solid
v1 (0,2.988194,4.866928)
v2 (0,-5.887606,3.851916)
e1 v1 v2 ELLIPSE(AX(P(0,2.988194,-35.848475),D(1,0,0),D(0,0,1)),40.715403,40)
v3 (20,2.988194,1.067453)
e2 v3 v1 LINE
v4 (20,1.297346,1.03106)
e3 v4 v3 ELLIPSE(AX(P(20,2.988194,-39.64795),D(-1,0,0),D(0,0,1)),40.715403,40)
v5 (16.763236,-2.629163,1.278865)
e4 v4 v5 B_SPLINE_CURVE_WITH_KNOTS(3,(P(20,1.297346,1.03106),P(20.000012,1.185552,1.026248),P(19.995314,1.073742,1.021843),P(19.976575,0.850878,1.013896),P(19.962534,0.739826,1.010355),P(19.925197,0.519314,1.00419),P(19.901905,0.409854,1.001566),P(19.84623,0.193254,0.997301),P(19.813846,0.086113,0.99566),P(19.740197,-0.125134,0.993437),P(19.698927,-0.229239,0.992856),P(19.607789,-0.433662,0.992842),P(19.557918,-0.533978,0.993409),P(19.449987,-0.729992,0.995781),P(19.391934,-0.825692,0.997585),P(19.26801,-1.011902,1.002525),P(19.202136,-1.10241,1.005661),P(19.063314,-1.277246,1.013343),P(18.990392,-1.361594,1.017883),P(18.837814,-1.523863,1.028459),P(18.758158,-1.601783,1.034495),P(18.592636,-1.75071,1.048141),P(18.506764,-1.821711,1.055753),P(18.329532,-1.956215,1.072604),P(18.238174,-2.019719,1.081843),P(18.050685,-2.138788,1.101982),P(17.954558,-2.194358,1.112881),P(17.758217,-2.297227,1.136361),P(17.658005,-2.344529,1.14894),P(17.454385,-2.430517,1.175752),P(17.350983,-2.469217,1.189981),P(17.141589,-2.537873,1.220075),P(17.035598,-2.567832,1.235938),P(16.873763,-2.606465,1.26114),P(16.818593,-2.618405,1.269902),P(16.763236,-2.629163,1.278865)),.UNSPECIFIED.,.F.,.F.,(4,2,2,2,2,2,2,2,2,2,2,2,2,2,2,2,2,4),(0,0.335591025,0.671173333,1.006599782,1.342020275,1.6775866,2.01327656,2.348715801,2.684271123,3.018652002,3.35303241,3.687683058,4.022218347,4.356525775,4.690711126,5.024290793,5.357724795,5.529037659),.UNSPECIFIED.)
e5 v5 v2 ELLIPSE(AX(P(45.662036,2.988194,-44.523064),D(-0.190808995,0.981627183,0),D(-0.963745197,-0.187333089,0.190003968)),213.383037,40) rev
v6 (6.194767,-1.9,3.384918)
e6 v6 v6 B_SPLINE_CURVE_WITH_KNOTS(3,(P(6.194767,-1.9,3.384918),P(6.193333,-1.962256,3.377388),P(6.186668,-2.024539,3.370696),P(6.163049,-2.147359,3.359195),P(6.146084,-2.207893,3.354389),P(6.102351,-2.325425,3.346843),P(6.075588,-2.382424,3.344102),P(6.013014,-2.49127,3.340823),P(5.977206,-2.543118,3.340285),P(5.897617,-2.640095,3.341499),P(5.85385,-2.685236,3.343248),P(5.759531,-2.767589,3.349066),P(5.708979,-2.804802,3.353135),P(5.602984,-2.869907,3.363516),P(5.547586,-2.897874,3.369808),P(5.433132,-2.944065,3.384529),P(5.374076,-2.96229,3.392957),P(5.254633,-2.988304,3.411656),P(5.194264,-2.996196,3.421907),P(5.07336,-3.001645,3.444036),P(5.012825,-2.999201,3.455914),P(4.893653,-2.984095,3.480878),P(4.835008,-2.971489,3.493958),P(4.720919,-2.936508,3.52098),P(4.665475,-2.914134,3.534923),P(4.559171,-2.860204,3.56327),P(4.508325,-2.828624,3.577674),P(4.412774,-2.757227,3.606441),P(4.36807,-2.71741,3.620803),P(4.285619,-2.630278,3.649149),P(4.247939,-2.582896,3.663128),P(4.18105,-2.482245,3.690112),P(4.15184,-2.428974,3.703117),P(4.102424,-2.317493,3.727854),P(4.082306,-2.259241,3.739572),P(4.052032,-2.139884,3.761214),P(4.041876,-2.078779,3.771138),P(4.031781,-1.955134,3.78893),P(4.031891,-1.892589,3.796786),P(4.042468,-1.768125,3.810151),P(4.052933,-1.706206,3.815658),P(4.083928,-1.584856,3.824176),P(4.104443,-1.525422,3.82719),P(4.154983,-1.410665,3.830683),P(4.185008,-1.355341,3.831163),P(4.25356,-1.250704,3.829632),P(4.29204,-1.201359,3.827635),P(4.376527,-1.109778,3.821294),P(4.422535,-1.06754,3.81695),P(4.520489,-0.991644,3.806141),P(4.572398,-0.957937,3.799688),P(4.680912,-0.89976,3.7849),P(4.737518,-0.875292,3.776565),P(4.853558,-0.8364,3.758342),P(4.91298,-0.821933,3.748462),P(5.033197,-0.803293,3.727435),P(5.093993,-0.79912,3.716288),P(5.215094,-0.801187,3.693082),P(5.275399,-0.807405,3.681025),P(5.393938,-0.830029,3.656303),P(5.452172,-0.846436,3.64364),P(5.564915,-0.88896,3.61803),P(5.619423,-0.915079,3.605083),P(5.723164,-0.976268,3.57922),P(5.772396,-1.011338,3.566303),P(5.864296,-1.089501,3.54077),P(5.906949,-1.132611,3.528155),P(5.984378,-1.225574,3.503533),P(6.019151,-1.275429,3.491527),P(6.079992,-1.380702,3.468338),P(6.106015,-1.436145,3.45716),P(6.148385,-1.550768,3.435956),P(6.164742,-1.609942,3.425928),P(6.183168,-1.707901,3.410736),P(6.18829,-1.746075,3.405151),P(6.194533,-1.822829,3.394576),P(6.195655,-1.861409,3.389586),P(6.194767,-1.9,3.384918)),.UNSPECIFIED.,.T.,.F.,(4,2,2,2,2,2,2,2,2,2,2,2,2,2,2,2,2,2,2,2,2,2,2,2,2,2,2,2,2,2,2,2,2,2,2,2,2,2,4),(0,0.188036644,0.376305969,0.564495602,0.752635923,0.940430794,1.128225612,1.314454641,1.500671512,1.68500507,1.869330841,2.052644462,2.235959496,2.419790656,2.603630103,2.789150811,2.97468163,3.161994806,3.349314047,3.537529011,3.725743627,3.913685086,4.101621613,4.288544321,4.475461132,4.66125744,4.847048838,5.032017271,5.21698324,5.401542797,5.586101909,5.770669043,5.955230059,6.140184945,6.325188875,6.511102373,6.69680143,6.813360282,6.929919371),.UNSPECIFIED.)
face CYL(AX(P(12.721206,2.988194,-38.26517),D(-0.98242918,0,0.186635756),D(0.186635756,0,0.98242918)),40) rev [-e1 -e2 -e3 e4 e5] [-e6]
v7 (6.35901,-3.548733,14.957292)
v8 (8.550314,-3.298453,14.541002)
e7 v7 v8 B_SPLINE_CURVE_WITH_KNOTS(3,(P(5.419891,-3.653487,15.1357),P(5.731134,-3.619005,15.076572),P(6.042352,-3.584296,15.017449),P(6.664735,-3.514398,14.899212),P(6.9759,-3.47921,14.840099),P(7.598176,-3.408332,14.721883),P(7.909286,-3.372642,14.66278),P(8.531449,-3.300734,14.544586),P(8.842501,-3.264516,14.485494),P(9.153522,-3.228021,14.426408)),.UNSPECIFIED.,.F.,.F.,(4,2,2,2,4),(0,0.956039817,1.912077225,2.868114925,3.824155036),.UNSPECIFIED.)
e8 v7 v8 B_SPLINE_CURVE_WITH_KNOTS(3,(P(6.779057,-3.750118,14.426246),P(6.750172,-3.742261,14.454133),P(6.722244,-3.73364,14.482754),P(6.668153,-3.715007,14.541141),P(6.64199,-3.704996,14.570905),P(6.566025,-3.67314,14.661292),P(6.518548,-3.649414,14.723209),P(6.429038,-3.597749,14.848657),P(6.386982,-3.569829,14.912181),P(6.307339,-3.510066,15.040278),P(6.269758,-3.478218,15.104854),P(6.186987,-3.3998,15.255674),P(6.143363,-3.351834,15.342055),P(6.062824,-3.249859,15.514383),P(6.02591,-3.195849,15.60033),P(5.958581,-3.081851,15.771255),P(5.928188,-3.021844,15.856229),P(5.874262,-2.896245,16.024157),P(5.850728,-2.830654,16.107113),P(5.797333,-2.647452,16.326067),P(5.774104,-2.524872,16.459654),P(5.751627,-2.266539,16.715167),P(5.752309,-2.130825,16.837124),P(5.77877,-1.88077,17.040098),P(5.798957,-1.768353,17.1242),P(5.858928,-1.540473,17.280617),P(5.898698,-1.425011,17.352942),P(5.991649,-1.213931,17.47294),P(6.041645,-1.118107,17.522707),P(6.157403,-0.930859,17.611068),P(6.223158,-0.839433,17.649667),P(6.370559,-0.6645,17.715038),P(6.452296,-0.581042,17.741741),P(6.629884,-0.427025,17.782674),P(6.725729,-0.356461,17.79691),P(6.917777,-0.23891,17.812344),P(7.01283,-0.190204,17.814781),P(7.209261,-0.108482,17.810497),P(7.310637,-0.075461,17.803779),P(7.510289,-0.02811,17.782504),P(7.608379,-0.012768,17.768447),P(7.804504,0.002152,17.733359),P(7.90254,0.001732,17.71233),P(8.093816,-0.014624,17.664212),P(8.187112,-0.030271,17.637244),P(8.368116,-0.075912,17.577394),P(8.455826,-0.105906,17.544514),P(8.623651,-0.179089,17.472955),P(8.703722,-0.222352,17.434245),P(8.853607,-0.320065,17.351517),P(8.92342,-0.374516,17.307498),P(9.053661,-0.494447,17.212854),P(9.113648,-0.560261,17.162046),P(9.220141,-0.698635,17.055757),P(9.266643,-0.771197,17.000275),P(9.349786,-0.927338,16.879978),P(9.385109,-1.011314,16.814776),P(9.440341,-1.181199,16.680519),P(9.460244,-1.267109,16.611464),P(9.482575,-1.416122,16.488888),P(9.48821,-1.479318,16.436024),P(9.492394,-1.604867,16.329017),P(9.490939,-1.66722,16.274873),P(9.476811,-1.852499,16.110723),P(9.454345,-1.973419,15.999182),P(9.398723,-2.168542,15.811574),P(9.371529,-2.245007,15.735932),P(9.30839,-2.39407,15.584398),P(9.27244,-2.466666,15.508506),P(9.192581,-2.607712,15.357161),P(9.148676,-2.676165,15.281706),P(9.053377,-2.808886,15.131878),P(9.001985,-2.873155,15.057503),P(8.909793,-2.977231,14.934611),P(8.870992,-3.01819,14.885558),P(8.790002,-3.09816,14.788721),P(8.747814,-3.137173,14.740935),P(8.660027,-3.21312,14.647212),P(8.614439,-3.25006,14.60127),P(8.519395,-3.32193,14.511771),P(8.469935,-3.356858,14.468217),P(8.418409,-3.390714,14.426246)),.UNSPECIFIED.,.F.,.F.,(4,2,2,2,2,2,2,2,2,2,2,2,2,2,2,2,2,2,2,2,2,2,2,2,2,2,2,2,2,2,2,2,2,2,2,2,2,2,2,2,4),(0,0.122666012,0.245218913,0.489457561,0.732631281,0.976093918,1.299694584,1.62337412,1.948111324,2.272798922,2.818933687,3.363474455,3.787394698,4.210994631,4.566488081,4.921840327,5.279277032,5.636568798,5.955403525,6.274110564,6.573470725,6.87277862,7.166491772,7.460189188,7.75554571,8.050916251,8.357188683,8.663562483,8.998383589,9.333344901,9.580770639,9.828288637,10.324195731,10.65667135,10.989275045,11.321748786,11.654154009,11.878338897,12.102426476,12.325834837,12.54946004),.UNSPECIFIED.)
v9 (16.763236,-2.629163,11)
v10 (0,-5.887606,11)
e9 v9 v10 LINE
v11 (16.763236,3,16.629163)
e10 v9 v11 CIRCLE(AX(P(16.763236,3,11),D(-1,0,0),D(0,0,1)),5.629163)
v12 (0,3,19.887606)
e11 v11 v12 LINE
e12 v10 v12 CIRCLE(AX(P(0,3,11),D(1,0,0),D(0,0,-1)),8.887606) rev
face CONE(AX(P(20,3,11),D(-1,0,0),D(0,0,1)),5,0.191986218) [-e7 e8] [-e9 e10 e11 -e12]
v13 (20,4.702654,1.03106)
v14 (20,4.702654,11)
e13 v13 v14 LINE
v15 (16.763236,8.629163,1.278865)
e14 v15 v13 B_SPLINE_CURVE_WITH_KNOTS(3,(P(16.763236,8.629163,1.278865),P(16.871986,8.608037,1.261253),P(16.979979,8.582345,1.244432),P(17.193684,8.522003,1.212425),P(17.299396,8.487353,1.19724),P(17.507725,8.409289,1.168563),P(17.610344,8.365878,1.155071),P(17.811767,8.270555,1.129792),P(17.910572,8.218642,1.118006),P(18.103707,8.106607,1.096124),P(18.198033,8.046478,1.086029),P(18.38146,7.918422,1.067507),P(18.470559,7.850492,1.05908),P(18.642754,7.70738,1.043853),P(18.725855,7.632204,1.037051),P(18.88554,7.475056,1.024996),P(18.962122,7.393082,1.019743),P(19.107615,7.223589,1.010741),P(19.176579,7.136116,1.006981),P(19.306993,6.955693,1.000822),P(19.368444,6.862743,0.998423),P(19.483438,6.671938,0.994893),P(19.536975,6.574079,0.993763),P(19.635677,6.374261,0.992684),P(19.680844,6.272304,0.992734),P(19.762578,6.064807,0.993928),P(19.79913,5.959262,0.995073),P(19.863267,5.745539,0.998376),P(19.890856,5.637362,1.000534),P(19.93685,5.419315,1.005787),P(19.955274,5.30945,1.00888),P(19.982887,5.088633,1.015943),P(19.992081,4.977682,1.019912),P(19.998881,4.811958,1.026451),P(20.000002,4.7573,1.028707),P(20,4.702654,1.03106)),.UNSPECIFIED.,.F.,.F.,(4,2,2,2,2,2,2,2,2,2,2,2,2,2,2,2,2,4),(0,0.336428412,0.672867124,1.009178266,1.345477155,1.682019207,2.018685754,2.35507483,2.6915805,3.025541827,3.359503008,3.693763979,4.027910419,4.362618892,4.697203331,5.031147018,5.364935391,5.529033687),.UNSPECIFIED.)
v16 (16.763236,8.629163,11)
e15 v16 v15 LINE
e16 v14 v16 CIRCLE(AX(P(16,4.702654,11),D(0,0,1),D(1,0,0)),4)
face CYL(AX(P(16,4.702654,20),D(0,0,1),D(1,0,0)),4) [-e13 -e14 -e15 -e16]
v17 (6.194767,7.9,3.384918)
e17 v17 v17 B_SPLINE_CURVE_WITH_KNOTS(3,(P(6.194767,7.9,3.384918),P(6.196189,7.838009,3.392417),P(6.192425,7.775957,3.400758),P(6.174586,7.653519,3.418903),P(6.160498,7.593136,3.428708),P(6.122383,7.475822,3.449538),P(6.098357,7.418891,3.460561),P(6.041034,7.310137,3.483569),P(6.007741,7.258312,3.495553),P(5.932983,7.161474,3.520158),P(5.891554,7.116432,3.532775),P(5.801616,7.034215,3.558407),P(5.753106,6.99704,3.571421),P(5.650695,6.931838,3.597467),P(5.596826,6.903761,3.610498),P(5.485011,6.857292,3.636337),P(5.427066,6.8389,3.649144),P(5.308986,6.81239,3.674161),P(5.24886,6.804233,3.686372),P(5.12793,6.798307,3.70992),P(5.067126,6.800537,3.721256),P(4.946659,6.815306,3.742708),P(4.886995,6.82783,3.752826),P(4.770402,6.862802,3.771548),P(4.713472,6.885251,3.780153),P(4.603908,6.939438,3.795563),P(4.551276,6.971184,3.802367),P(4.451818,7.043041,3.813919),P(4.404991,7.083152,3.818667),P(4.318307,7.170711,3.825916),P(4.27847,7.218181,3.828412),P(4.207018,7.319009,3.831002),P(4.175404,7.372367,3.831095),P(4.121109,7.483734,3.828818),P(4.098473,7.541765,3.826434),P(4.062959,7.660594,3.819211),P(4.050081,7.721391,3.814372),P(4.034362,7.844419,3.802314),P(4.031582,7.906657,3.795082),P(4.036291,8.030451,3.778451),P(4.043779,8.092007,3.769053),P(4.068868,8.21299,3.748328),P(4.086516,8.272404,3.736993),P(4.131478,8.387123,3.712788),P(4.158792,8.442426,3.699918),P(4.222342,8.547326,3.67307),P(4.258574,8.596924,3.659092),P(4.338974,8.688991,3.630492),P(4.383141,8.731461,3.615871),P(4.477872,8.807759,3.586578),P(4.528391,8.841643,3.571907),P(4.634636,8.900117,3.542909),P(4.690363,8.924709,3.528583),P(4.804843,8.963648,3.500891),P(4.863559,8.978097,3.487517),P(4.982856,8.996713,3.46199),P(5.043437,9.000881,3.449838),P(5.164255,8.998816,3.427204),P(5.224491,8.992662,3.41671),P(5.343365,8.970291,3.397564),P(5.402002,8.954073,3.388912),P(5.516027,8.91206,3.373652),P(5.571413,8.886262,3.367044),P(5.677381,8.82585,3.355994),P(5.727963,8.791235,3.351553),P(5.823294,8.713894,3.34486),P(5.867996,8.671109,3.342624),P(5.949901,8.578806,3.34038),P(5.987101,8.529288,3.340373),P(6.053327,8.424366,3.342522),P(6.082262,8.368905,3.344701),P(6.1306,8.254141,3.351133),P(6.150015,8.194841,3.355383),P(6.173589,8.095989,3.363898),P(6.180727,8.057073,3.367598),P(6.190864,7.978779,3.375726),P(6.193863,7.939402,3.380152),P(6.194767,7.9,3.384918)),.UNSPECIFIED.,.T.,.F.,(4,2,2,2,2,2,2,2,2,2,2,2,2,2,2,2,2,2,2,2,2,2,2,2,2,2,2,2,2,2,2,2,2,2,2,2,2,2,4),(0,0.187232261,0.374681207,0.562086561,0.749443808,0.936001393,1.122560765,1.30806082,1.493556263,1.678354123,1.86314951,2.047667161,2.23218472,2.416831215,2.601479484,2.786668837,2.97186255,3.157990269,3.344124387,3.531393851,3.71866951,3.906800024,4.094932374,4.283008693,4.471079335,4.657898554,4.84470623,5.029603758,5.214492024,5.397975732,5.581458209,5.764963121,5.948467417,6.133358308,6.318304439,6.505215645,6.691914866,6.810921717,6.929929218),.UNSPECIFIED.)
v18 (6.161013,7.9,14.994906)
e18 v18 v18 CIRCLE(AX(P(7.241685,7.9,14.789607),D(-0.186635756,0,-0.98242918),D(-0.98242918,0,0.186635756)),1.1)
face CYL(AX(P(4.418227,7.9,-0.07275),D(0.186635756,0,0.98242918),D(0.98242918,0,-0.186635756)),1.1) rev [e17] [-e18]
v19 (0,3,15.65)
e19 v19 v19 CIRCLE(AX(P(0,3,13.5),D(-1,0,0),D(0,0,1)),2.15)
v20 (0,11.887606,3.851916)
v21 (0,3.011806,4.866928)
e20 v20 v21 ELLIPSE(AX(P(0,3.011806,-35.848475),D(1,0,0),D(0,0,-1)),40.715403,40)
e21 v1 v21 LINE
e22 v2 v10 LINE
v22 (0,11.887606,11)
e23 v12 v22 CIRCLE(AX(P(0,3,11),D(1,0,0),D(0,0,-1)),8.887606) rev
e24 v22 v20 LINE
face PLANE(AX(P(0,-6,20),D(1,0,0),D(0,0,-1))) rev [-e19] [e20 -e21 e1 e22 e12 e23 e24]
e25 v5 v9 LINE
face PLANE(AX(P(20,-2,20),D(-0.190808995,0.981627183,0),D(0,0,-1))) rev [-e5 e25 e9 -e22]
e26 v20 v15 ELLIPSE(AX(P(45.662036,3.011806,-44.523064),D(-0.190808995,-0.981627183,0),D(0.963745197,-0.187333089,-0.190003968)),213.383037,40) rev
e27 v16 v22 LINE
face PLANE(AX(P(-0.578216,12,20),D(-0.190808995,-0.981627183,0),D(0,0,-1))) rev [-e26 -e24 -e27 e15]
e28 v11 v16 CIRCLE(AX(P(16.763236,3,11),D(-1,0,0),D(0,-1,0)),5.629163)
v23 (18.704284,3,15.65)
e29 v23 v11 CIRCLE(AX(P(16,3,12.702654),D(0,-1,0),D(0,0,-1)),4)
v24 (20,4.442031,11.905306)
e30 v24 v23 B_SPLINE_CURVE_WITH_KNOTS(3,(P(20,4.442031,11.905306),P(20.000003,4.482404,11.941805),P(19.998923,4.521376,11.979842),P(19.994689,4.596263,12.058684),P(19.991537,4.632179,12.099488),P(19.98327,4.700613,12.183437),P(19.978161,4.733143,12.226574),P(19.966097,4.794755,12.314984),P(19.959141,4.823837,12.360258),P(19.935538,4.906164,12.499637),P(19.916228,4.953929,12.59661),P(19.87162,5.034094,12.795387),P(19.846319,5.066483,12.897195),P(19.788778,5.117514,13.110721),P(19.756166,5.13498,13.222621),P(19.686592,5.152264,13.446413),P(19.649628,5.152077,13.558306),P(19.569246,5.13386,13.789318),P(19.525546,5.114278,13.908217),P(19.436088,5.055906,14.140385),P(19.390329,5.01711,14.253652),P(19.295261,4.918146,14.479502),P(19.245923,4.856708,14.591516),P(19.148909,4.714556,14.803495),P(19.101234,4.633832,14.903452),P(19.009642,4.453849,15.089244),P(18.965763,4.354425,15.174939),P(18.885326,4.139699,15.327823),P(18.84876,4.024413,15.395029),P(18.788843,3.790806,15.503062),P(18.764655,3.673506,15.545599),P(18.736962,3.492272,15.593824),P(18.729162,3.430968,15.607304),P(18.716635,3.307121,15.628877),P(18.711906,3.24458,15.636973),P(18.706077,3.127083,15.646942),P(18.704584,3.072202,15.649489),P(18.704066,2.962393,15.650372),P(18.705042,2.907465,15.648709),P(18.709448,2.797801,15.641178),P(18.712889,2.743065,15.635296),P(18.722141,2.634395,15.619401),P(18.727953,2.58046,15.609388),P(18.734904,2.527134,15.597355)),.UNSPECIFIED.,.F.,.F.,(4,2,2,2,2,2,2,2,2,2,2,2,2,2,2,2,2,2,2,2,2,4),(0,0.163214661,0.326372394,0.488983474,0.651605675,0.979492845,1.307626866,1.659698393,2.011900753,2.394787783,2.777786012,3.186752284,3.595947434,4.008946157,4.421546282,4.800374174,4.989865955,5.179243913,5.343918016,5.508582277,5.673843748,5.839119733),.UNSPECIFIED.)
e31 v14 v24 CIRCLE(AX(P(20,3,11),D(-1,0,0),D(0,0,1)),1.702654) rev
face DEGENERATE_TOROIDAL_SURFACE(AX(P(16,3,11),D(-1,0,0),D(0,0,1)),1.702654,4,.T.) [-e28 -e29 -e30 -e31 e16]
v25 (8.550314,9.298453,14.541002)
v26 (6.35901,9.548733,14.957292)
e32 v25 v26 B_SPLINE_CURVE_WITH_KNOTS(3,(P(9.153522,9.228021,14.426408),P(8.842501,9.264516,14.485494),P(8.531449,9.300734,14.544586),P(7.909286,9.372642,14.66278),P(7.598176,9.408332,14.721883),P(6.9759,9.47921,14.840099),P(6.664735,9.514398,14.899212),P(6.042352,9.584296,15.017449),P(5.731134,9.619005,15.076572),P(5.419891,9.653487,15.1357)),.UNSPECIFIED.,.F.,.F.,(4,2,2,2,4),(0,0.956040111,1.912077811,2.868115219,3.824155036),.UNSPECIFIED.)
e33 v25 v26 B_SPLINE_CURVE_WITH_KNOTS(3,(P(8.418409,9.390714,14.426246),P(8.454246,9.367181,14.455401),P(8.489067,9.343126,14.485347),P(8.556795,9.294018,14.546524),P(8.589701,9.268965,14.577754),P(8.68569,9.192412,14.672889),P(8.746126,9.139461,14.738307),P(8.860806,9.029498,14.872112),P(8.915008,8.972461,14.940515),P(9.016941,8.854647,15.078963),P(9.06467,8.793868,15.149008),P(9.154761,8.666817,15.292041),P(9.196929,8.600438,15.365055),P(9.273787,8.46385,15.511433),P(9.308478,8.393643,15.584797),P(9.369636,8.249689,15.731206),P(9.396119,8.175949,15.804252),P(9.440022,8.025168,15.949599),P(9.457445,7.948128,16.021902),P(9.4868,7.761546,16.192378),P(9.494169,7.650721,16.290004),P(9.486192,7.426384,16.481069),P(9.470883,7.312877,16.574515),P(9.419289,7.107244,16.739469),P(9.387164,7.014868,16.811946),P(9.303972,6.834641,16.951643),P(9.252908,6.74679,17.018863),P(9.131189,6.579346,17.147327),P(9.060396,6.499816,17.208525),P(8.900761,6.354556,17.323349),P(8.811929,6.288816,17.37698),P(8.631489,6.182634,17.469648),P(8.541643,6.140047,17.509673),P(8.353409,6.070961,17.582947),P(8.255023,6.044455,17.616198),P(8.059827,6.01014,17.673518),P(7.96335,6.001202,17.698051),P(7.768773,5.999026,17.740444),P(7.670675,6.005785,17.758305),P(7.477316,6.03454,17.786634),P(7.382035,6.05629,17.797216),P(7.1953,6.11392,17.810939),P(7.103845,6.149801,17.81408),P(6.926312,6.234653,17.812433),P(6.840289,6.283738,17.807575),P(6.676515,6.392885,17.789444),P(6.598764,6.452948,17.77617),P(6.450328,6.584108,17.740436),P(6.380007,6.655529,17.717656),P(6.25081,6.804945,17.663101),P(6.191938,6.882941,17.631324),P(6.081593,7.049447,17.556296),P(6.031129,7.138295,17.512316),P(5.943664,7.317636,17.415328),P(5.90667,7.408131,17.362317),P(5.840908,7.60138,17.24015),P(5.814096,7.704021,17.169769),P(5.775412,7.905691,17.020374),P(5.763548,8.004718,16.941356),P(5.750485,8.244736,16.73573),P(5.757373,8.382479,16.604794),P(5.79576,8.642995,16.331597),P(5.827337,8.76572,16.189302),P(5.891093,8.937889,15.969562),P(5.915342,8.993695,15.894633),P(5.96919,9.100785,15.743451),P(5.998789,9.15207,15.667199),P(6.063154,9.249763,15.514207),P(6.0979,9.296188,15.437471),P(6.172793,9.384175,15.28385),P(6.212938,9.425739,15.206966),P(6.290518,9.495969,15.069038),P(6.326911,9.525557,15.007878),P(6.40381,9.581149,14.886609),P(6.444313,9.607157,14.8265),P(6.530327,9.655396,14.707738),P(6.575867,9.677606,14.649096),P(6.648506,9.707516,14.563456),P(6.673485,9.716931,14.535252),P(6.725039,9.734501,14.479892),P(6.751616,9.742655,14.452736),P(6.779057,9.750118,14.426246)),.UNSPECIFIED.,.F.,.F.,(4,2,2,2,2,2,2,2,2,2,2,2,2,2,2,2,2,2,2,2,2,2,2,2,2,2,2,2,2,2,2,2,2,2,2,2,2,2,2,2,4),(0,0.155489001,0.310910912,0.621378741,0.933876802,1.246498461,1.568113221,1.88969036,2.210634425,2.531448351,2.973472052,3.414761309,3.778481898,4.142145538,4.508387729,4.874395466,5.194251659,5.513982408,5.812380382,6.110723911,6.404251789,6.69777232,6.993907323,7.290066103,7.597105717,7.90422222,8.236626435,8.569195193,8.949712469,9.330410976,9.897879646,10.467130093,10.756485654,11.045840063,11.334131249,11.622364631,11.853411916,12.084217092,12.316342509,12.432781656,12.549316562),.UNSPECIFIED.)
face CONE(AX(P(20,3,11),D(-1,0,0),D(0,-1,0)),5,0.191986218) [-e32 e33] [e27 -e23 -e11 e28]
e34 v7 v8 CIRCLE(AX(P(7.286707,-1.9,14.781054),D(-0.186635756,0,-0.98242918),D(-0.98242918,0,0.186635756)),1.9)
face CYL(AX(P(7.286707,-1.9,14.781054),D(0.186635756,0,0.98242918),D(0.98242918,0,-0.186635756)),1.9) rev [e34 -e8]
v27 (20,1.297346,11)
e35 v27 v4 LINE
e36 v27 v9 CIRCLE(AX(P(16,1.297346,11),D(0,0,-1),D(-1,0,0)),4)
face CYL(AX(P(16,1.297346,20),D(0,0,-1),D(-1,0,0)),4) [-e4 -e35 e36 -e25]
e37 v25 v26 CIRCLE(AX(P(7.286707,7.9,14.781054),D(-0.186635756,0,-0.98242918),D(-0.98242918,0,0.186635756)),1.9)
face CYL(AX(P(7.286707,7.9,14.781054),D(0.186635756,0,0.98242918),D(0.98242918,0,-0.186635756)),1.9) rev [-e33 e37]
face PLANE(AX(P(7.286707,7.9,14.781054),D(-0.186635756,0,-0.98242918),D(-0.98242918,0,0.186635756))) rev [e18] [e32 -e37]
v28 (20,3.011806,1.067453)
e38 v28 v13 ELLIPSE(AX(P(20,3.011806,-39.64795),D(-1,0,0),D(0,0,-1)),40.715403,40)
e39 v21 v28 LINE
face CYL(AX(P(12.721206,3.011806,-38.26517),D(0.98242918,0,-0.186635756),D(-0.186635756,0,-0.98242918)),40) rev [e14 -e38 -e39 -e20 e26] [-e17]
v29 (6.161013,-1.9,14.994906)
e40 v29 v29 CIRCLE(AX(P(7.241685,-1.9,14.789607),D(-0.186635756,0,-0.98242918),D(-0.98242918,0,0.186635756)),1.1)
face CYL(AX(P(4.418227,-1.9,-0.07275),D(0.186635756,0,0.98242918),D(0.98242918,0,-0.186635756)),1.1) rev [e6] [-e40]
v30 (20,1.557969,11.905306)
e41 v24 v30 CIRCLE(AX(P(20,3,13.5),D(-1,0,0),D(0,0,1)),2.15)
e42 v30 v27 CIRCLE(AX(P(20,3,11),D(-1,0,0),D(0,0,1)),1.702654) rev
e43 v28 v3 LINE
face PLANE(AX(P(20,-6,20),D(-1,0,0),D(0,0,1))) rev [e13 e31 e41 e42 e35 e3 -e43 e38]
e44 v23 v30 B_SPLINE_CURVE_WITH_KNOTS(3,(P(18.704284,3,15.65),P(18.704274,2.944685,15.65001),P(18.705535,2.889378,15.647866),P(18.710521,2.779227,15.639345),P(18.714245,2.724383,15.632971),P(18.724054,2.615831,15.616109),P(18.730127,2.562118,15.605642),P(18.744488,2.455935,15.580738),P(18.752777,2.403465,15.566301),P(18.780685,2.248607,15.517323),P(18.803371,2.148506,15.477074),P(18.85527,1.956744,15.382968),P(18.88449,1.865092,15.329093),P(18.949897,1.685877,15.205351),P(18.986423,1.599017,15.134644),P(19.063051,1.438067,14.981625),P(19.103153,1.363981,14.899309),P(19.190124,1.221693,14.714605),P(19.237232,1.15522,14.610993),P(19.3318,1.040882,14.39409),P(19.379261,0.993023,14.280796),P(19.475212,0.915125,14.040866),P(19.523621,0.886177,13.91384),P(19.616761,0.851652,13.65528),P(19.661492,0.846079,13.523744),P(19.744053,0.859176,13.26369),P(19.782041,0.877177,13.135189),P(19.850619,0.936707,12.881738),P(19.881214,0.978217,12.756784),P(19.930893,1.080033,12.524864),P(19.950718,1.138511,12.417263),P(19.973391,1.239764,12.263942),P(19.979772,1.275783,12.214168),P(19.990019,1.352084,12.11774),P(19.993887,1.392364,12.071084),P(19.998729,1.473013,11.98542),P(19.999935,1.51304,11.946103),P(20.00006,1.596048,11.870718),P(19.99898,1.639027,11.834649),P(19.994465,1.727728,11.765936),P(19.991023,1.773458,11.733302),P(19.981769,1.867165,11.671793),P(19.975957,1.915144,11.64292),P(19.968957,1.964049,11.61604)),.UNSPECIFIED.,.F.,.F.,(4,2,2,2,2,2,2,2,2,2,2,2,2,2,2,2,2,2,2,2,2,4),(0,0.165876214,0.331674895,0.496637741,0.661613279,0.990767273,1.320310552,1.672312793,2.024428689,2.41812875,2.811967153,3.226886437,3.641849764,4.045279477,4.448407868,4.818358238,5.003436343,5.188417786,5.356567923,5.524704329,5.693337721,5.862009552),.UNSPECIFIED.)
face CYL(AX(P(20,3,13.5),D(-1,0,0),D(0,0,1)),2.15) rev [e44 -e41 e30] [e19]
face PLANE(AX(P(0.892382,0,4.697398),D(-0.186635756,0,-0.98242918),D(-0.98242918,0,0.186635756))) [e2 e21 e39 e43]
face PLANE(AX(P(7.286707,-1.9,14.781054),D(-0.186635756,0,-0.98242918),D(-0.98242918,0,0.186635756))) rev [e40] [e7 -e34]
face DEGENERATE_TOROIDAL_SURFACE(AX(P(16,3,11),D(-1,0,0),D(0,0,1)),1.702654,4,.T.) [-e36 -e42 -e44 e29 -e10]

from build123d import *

# Parameters (mm, degrees)
ESQUISSE1_W                  = 20
ESQUISSE1_H                  = 18
BOSS_EXTRU_1_DEPTH           = 20
ENL_V_MAT_EXTRU_1_DEPTH      = 34.526109228
ENL_V_MAT_EXTRU_1_DEPTH_BACK = 34.526109228
ESQUISSE4_W                  = 23.372047651
ESQUISSE4_H                  = 17.8
ENL_V_MAT_EXTRU_3_DEPTH      = 1
CONG_2_R                     = 40
ESQUISSE5_R                  = 2.15
ENL_V_MAT_EXTRU_4_DEPTH      = 31.724582991
CONG_3_R                     = 9
CHANFREIN1_SIZE              = 20.578216064
CHANFREIN1_SIZE_2            = 4
CONG_4_R                     = 4
ESQUISSE6_R                  = 1.1
ENL_V_MAT_EXTRU_5_DEPTH      = 253.375332695
ESQUISSE10_R                 = 1.9
ENL_V_MAT_EXTRU_6_DEPTH      = 7.5


# Some blends are built 0.0001 mm under size
with BuildPart() as part:
    # Esquisse1 → Boss.-Extru.1 (new body)
    with BuildSketch(Plane.XY):
        with Locations((10, 3)):
            Rectangle(ESQUISSE1_W, ESQUISSE1_H)
    extrude(amount=BOSS_EXTRU_1_DEPTH)

    # Esquisse2 → Enlèv. mat.-Extru.1 (cut, two sides: drawn at the far end of the back side and taken through both)
    with BuildSketch(Plane(origin=(0, 12, 0), x_dir=(1, 0, 0), z_dir=(0, 1, 0)).offset(-ENL_V_MAT_EXTRU_1_DEPTH_BACK)):
        Polygon((85.451214086, 12.384445057), (20.045630921, -0.0408989), (0, -3.849042594), (0, 0), (0, 66.575366927), (71.310016401, 179.020907021), (156.761230487, 124.829985151), align=None)
    extrude(amount=ENL_V_MAT_EXTRU_1_DEPTH + ENL_V_MAT_EXTRU_1_DEPTH_BACK, mode=Mode.SUBTRACT)

    # Esquisse4 → Enlèv. mat.-Extru.3 (cut)
    with BuildSketch(Plane(origin=(0.705746644, 0, 3.714969257), x_dir=(-0.9824291803850712, 0, 0.1866357562952965), z_dir=(-0.1866357562952965, 0, -0.9824291803850712))):
        with Locations((-7.953308699, 3)):
            Rectangle(ESQUISSE4_W, ESQUISSE4_H)
    extrude(amount=-ENL_V_MAT_EXTRU_3_DEPTH, mode=Mode.SUBTRACT)

    # Congé2
    # the kernel refuses this fillet: 40 mm, written as the material it adds along each edge
    with BuildSketch(Plane(origin=(41.830053891, 11.9, -3.079684565), x_dir=(0, -1, 0), z_dir=(-0.9824291803850712, 0, 0.1866357562952965))) as cong_2_piece_1_section:
        with BuildLine():
            CenterArc((8.888194417, -40), CONG_2_R, 90, 12.838568141)
            Line((0, -1), (0, 0))
            Line((0, 0), (8.888194417, 0))
        make_face()
    cong_2_piece_1 = extrude(amount=64.798673587, mode=Mode.PRIVATE)
    cong_2_piece_1 = split(cong_2_piece_1, bisect_by=Plane(origin=(20, 11.9, -3.079684565), z_dir=(-1, 0, 0)), keep=Keep.TOP, mode=Mode.PRIVATE)
    cong_2_piece_1 = split(cong_2_piece_1, bisect_by=Plane(origin=(0, 11.9, -3.079684565), z_dir=(1, 0, 0)), keep=Keep.TOP, mode=Mode.PRIVATE)
    add(cong_2_piece_1)
    with BuildSketch(Plane(origin=(-21.830053891, -5.9, 9.014064887), x_dir=(-0.18663575629529652, 1.7763568394002434e-15, -0.9824291803850713), z_dir=(0.9824291803850712, 0, -0.1866357562952965))) as cong_2_piece_2_section:
        with BuildLine():
            CenterArc((40, 8.888194417), CONG_2_R, 180, 12.838568141)
            Line((0, 8.888194417), (0, 0))
            Line((0, 0), (1, 0))
        make_face()
    cong_2_piece_2 = extrude(amount=64.798673587, mode=Mode.PRIVATE)
    cong_2_piece_2 = split(cong_2_piece_2, bisect_by=Plane(origin=(20, -5.9, 9.014064887), z_dir=(-1, 0, 0)), keep=Keep.TOP, mode=Mode.PRIVATE)
    cong_2_piece_2 = split(cong_2_piece_2, bisect_by=Plane(origin=(0, -5.9, 9.014064887), z_dir=(1, 0, 0)), keep=Keep.TOP, mode=Mode.PRIVATE)
    add(cong_2_piece_2)

    # Esquisse5 → Enlèv. mat.-Extru.4 (cut, through all)
    with BuildSketch(Plane.ZY):
        with Locations((13.5, 3)):
            Circle(ESQUISSE5_R)
    extrude(amount=-ENL_V_MAT_EXTRU_4_DEPTH, mode=Mode.SUBTRACT)

    # Congé3
    cong_3_edges = [part.edges().sort_by_distance(p)[0] for p in [
        (10, 12, 20),
        (10, -6, 20),
    ]]
    fillet(cong_3_edges, radius=CONG_3_R - 0.0001)  # a hair under: the kernel refuses the full size

    # Chanfrein1
    # the kernel refuses this chamfer: 20.578216064, 4 mm, written as the material it takes off along each edge
    with BuildSketch(Plane(origin=(20, -6, -53.417428004), x_dir=(-1, 0, 0), z_dir=(0, 0, 1))) as chanfrein1_piece_1:
        Polygon((CHANFREIN1_SIZE, 0), (0, -CHANFREIN1_SIZE_2), (0, 0), align=None)
    extrude(amount=64.417528004, mode=Mode.SUBTRACT)
    with BuildSketch(Plane(origin=(20, 2.9999, 11.0001), x_dir=(0, -1, 0), z_dir=(0, 0, -1))) as chanfrein1_piece_2:
        Polygon((8.9999, CHANFREIN1_SIZE), (8.9999 - CHANFREIN1_SIZE_2, 0), (8.9999, 0), align=None)
    revolve(axis=Axis((20, 2.9999, 11.0001), (-1, 0, 0)), revolution_arc=90, mode=Mode.SUBTRACT)
    with BuildSketch(Plane(origin=(20, 3.0001, 11.0001), x_dir=(0, 0, 1), z_dir=(0, -1, 0))) as chanfrein1_piece_3:
        Polygon((8.9999, CHANFREIN1_SIZE), (8.9999 - CHANFREIN1_SIZE_2, 0), (8.9999, 0), align=None)
    revolve(axis=Axis((20, 3.0001, 11.0001), (-1, 0, 0)), revolution_arc=90, mode=Mode.SUBTRACT)
    with BuildSketch(Plane(origin=(20, 12, -53.417428004), x_dir=(-1, 0, 0), z_dir=(0, 0, 1))) as chanfrein1_piece_4:
        Polygon((CHANFREIN1_SIZE, 0), (0, CHANFREIN1_SIZE_2), (0, 0), align=None)
    extrude(amount=64.417528004, mode=Mode.SUBTRACT)
    with BuildSketch(Plane(origin=(20, 2.9999, 20), x_dir=(-1, 0, 0), z_dir=(0, 1, 0))) as chanfrein1_piece_5:
        Polygon((CHANFREIN1_SIZE, 0), (0, -CHANFREIN1_SIZE_2), (0, 0), align=None)
    extrude(amount=0.0002, mode=Mode.SUBTRACT)

    # Congé4
    # the kernel refuses this fillet: 4 mm, written as the material it takes off along each edge
    with BuildSketch(Plane(origin=(20, -2, -7.493740481), x_dir=(-0.9816271834478703, -0.19080899537548365, 0), z_dir=(0, 0, 1))) as cong_4_piece_1:
        with BuildLine():
            CenterArc((CONG_4_R * 0.824336385818, -CONG_4_R), CONG_4_R, 90, 79)
            Line((-CONG_4_R * 0.157290797629, -CONG_4_R * 0.809191004625), (0, 0))
            Line((0, 0), (CONG_4_R * 0.824336385818, 0))
        make_face()
    extrude(amount=18.493840481, mode=Mode.SUBTRACT)
    with BuildSketch(Plane(origin=(20, 2.9999, 11.0001), x_dir=(0, -1, 0), z_dir=(0, 0, -1))) as cong_4_piece_2:
        with BuildLine():
            CenterArc((4.9999 - CONG_4_R * 0.824336385818, CONG_4_R), CONG_4_R, 270, 79)
            Line((4.9999 - CONG_4_R * 0.824336385818, 0), (4.9999, 0))
            Line((4.9999, 0), (4.9999 + CONG_4_R * 0.157290797629, CONG_4_R * 0.809191004625))
        make_face()
    revolve(axis=Axis((20, 2.9999, 11.0001), (-1, 0, 0)), revolution_arc=90, mode=Mode.SUBTRACT)
    with BuildSketch(Plane(origin=(20, 3.0001, 11.0001), x_dir=(0, 0, 1), z_dir=(0, -1, 0))) as cong_4_piece_3:
        with BuildLine():
            CenterArc((4.9999 - CONG_4_R * 0.824336385818, CONG_4_R), CONG_4_R, 270, 79)
            Line((4.9999 - CONG_4_R * 0.824336385818, 0), (4.9999, 0))
            Line((4.9999, 0), (4.9999 + CONG_4_R * 0.157290797629, CONG_4_R * 0.809191004625))
        make_face()
    revolve(axis=Axis((20, 3.0001, 11.0001), (-1, 0, 0)), revolution_arc=90, mode=Mode.SUBTRACT)
    with BuildSketch(Plane(origin=(20, 8, -7.493740481), x_dir=(-0.9816271834478704, 0.19080899537548335, 0), z_dir=(0, 0, 1))) as cong_4_piece_4:
        with BuildLine():
            CenterArc((CONG_4_R * 0.824336385818, CONG_4_R), CONG_4_R, 191, 79)
            Line((-CONG_4_R * 0.157290797629, CONG_4_R * 0.809191004625), (0, 0))
            Line((0, 0), (CONG_4_R * 0.824336385818, 0))
        make_face()
    extrude(amount=18.493840481, mode=Mode.SUBTRACT)
    with BuildSketch(Plane(origin=(20, 2.9999, 16), x_dir=(-0.9816271834478704, 0, 0.19080899537548315), z_dir=(0, 1, 0))) as cong_4_piece_5:
        with BuildLine():
            CenterArc((CONG_4_R * 0.824336385818, -CONG_4_R), CONG_4_R, 90, 79)
            Line((-CONG_4_R * 0.157290797629, -CONG_4_R * 0.809191004625), (0, 0))
            Line((0, 0), (CONG_4_R * 0.824336385818, 0))
        make_face()
    extrude(amount=0.0002, mode=Mode.SUBTRACT)

    # Esquisse6 → Enlèv. mat.-Extru.5 (cut, through all)
    with BuildSketch(Plane(origin=(248.354172881, 0, -23.381298734), x_dir=(-0.9824291803850712, 0, 0.1866357562952965), z_dir=(-0.1866357562952965, 0, -0.9824291803850712))):
        with Locations(Location((244, 7.9, 0), (0, 0, 180))):
            Circle(ESQUISSE6_R)
        with Locations(Location((244, -1.9, 0), (0, 0, 180))):
            Circle(ESQUISSE6_R)
    extrude(amount=ENL_V_MAT_EXTRU_5_DEPTH, mode=Mode.SUBTRACT)

    # Esquisse10 → Enlèv. mat.-Extru.6 (cut)
    with BuildSketch(Plane(origin=(4.363786372, 0, 22.970470151), x_dir=(-0.9824291803850712, 0, 0.1866357562952965), z_dir=(-0.1866357562952965, 0, -0.9824291803850712))):
        with Locations((-4.4, 7.9)):
            Circle(ESQUISSE10_R)
        with Locations((-4.4, -1.9)):
            Circle(ESQUISSE10_R)
    extrude(amount=ENL_V_MAT_EXTRU_6_DEPTH, mode=Mode.SUBTRACT)


solid = part.part
